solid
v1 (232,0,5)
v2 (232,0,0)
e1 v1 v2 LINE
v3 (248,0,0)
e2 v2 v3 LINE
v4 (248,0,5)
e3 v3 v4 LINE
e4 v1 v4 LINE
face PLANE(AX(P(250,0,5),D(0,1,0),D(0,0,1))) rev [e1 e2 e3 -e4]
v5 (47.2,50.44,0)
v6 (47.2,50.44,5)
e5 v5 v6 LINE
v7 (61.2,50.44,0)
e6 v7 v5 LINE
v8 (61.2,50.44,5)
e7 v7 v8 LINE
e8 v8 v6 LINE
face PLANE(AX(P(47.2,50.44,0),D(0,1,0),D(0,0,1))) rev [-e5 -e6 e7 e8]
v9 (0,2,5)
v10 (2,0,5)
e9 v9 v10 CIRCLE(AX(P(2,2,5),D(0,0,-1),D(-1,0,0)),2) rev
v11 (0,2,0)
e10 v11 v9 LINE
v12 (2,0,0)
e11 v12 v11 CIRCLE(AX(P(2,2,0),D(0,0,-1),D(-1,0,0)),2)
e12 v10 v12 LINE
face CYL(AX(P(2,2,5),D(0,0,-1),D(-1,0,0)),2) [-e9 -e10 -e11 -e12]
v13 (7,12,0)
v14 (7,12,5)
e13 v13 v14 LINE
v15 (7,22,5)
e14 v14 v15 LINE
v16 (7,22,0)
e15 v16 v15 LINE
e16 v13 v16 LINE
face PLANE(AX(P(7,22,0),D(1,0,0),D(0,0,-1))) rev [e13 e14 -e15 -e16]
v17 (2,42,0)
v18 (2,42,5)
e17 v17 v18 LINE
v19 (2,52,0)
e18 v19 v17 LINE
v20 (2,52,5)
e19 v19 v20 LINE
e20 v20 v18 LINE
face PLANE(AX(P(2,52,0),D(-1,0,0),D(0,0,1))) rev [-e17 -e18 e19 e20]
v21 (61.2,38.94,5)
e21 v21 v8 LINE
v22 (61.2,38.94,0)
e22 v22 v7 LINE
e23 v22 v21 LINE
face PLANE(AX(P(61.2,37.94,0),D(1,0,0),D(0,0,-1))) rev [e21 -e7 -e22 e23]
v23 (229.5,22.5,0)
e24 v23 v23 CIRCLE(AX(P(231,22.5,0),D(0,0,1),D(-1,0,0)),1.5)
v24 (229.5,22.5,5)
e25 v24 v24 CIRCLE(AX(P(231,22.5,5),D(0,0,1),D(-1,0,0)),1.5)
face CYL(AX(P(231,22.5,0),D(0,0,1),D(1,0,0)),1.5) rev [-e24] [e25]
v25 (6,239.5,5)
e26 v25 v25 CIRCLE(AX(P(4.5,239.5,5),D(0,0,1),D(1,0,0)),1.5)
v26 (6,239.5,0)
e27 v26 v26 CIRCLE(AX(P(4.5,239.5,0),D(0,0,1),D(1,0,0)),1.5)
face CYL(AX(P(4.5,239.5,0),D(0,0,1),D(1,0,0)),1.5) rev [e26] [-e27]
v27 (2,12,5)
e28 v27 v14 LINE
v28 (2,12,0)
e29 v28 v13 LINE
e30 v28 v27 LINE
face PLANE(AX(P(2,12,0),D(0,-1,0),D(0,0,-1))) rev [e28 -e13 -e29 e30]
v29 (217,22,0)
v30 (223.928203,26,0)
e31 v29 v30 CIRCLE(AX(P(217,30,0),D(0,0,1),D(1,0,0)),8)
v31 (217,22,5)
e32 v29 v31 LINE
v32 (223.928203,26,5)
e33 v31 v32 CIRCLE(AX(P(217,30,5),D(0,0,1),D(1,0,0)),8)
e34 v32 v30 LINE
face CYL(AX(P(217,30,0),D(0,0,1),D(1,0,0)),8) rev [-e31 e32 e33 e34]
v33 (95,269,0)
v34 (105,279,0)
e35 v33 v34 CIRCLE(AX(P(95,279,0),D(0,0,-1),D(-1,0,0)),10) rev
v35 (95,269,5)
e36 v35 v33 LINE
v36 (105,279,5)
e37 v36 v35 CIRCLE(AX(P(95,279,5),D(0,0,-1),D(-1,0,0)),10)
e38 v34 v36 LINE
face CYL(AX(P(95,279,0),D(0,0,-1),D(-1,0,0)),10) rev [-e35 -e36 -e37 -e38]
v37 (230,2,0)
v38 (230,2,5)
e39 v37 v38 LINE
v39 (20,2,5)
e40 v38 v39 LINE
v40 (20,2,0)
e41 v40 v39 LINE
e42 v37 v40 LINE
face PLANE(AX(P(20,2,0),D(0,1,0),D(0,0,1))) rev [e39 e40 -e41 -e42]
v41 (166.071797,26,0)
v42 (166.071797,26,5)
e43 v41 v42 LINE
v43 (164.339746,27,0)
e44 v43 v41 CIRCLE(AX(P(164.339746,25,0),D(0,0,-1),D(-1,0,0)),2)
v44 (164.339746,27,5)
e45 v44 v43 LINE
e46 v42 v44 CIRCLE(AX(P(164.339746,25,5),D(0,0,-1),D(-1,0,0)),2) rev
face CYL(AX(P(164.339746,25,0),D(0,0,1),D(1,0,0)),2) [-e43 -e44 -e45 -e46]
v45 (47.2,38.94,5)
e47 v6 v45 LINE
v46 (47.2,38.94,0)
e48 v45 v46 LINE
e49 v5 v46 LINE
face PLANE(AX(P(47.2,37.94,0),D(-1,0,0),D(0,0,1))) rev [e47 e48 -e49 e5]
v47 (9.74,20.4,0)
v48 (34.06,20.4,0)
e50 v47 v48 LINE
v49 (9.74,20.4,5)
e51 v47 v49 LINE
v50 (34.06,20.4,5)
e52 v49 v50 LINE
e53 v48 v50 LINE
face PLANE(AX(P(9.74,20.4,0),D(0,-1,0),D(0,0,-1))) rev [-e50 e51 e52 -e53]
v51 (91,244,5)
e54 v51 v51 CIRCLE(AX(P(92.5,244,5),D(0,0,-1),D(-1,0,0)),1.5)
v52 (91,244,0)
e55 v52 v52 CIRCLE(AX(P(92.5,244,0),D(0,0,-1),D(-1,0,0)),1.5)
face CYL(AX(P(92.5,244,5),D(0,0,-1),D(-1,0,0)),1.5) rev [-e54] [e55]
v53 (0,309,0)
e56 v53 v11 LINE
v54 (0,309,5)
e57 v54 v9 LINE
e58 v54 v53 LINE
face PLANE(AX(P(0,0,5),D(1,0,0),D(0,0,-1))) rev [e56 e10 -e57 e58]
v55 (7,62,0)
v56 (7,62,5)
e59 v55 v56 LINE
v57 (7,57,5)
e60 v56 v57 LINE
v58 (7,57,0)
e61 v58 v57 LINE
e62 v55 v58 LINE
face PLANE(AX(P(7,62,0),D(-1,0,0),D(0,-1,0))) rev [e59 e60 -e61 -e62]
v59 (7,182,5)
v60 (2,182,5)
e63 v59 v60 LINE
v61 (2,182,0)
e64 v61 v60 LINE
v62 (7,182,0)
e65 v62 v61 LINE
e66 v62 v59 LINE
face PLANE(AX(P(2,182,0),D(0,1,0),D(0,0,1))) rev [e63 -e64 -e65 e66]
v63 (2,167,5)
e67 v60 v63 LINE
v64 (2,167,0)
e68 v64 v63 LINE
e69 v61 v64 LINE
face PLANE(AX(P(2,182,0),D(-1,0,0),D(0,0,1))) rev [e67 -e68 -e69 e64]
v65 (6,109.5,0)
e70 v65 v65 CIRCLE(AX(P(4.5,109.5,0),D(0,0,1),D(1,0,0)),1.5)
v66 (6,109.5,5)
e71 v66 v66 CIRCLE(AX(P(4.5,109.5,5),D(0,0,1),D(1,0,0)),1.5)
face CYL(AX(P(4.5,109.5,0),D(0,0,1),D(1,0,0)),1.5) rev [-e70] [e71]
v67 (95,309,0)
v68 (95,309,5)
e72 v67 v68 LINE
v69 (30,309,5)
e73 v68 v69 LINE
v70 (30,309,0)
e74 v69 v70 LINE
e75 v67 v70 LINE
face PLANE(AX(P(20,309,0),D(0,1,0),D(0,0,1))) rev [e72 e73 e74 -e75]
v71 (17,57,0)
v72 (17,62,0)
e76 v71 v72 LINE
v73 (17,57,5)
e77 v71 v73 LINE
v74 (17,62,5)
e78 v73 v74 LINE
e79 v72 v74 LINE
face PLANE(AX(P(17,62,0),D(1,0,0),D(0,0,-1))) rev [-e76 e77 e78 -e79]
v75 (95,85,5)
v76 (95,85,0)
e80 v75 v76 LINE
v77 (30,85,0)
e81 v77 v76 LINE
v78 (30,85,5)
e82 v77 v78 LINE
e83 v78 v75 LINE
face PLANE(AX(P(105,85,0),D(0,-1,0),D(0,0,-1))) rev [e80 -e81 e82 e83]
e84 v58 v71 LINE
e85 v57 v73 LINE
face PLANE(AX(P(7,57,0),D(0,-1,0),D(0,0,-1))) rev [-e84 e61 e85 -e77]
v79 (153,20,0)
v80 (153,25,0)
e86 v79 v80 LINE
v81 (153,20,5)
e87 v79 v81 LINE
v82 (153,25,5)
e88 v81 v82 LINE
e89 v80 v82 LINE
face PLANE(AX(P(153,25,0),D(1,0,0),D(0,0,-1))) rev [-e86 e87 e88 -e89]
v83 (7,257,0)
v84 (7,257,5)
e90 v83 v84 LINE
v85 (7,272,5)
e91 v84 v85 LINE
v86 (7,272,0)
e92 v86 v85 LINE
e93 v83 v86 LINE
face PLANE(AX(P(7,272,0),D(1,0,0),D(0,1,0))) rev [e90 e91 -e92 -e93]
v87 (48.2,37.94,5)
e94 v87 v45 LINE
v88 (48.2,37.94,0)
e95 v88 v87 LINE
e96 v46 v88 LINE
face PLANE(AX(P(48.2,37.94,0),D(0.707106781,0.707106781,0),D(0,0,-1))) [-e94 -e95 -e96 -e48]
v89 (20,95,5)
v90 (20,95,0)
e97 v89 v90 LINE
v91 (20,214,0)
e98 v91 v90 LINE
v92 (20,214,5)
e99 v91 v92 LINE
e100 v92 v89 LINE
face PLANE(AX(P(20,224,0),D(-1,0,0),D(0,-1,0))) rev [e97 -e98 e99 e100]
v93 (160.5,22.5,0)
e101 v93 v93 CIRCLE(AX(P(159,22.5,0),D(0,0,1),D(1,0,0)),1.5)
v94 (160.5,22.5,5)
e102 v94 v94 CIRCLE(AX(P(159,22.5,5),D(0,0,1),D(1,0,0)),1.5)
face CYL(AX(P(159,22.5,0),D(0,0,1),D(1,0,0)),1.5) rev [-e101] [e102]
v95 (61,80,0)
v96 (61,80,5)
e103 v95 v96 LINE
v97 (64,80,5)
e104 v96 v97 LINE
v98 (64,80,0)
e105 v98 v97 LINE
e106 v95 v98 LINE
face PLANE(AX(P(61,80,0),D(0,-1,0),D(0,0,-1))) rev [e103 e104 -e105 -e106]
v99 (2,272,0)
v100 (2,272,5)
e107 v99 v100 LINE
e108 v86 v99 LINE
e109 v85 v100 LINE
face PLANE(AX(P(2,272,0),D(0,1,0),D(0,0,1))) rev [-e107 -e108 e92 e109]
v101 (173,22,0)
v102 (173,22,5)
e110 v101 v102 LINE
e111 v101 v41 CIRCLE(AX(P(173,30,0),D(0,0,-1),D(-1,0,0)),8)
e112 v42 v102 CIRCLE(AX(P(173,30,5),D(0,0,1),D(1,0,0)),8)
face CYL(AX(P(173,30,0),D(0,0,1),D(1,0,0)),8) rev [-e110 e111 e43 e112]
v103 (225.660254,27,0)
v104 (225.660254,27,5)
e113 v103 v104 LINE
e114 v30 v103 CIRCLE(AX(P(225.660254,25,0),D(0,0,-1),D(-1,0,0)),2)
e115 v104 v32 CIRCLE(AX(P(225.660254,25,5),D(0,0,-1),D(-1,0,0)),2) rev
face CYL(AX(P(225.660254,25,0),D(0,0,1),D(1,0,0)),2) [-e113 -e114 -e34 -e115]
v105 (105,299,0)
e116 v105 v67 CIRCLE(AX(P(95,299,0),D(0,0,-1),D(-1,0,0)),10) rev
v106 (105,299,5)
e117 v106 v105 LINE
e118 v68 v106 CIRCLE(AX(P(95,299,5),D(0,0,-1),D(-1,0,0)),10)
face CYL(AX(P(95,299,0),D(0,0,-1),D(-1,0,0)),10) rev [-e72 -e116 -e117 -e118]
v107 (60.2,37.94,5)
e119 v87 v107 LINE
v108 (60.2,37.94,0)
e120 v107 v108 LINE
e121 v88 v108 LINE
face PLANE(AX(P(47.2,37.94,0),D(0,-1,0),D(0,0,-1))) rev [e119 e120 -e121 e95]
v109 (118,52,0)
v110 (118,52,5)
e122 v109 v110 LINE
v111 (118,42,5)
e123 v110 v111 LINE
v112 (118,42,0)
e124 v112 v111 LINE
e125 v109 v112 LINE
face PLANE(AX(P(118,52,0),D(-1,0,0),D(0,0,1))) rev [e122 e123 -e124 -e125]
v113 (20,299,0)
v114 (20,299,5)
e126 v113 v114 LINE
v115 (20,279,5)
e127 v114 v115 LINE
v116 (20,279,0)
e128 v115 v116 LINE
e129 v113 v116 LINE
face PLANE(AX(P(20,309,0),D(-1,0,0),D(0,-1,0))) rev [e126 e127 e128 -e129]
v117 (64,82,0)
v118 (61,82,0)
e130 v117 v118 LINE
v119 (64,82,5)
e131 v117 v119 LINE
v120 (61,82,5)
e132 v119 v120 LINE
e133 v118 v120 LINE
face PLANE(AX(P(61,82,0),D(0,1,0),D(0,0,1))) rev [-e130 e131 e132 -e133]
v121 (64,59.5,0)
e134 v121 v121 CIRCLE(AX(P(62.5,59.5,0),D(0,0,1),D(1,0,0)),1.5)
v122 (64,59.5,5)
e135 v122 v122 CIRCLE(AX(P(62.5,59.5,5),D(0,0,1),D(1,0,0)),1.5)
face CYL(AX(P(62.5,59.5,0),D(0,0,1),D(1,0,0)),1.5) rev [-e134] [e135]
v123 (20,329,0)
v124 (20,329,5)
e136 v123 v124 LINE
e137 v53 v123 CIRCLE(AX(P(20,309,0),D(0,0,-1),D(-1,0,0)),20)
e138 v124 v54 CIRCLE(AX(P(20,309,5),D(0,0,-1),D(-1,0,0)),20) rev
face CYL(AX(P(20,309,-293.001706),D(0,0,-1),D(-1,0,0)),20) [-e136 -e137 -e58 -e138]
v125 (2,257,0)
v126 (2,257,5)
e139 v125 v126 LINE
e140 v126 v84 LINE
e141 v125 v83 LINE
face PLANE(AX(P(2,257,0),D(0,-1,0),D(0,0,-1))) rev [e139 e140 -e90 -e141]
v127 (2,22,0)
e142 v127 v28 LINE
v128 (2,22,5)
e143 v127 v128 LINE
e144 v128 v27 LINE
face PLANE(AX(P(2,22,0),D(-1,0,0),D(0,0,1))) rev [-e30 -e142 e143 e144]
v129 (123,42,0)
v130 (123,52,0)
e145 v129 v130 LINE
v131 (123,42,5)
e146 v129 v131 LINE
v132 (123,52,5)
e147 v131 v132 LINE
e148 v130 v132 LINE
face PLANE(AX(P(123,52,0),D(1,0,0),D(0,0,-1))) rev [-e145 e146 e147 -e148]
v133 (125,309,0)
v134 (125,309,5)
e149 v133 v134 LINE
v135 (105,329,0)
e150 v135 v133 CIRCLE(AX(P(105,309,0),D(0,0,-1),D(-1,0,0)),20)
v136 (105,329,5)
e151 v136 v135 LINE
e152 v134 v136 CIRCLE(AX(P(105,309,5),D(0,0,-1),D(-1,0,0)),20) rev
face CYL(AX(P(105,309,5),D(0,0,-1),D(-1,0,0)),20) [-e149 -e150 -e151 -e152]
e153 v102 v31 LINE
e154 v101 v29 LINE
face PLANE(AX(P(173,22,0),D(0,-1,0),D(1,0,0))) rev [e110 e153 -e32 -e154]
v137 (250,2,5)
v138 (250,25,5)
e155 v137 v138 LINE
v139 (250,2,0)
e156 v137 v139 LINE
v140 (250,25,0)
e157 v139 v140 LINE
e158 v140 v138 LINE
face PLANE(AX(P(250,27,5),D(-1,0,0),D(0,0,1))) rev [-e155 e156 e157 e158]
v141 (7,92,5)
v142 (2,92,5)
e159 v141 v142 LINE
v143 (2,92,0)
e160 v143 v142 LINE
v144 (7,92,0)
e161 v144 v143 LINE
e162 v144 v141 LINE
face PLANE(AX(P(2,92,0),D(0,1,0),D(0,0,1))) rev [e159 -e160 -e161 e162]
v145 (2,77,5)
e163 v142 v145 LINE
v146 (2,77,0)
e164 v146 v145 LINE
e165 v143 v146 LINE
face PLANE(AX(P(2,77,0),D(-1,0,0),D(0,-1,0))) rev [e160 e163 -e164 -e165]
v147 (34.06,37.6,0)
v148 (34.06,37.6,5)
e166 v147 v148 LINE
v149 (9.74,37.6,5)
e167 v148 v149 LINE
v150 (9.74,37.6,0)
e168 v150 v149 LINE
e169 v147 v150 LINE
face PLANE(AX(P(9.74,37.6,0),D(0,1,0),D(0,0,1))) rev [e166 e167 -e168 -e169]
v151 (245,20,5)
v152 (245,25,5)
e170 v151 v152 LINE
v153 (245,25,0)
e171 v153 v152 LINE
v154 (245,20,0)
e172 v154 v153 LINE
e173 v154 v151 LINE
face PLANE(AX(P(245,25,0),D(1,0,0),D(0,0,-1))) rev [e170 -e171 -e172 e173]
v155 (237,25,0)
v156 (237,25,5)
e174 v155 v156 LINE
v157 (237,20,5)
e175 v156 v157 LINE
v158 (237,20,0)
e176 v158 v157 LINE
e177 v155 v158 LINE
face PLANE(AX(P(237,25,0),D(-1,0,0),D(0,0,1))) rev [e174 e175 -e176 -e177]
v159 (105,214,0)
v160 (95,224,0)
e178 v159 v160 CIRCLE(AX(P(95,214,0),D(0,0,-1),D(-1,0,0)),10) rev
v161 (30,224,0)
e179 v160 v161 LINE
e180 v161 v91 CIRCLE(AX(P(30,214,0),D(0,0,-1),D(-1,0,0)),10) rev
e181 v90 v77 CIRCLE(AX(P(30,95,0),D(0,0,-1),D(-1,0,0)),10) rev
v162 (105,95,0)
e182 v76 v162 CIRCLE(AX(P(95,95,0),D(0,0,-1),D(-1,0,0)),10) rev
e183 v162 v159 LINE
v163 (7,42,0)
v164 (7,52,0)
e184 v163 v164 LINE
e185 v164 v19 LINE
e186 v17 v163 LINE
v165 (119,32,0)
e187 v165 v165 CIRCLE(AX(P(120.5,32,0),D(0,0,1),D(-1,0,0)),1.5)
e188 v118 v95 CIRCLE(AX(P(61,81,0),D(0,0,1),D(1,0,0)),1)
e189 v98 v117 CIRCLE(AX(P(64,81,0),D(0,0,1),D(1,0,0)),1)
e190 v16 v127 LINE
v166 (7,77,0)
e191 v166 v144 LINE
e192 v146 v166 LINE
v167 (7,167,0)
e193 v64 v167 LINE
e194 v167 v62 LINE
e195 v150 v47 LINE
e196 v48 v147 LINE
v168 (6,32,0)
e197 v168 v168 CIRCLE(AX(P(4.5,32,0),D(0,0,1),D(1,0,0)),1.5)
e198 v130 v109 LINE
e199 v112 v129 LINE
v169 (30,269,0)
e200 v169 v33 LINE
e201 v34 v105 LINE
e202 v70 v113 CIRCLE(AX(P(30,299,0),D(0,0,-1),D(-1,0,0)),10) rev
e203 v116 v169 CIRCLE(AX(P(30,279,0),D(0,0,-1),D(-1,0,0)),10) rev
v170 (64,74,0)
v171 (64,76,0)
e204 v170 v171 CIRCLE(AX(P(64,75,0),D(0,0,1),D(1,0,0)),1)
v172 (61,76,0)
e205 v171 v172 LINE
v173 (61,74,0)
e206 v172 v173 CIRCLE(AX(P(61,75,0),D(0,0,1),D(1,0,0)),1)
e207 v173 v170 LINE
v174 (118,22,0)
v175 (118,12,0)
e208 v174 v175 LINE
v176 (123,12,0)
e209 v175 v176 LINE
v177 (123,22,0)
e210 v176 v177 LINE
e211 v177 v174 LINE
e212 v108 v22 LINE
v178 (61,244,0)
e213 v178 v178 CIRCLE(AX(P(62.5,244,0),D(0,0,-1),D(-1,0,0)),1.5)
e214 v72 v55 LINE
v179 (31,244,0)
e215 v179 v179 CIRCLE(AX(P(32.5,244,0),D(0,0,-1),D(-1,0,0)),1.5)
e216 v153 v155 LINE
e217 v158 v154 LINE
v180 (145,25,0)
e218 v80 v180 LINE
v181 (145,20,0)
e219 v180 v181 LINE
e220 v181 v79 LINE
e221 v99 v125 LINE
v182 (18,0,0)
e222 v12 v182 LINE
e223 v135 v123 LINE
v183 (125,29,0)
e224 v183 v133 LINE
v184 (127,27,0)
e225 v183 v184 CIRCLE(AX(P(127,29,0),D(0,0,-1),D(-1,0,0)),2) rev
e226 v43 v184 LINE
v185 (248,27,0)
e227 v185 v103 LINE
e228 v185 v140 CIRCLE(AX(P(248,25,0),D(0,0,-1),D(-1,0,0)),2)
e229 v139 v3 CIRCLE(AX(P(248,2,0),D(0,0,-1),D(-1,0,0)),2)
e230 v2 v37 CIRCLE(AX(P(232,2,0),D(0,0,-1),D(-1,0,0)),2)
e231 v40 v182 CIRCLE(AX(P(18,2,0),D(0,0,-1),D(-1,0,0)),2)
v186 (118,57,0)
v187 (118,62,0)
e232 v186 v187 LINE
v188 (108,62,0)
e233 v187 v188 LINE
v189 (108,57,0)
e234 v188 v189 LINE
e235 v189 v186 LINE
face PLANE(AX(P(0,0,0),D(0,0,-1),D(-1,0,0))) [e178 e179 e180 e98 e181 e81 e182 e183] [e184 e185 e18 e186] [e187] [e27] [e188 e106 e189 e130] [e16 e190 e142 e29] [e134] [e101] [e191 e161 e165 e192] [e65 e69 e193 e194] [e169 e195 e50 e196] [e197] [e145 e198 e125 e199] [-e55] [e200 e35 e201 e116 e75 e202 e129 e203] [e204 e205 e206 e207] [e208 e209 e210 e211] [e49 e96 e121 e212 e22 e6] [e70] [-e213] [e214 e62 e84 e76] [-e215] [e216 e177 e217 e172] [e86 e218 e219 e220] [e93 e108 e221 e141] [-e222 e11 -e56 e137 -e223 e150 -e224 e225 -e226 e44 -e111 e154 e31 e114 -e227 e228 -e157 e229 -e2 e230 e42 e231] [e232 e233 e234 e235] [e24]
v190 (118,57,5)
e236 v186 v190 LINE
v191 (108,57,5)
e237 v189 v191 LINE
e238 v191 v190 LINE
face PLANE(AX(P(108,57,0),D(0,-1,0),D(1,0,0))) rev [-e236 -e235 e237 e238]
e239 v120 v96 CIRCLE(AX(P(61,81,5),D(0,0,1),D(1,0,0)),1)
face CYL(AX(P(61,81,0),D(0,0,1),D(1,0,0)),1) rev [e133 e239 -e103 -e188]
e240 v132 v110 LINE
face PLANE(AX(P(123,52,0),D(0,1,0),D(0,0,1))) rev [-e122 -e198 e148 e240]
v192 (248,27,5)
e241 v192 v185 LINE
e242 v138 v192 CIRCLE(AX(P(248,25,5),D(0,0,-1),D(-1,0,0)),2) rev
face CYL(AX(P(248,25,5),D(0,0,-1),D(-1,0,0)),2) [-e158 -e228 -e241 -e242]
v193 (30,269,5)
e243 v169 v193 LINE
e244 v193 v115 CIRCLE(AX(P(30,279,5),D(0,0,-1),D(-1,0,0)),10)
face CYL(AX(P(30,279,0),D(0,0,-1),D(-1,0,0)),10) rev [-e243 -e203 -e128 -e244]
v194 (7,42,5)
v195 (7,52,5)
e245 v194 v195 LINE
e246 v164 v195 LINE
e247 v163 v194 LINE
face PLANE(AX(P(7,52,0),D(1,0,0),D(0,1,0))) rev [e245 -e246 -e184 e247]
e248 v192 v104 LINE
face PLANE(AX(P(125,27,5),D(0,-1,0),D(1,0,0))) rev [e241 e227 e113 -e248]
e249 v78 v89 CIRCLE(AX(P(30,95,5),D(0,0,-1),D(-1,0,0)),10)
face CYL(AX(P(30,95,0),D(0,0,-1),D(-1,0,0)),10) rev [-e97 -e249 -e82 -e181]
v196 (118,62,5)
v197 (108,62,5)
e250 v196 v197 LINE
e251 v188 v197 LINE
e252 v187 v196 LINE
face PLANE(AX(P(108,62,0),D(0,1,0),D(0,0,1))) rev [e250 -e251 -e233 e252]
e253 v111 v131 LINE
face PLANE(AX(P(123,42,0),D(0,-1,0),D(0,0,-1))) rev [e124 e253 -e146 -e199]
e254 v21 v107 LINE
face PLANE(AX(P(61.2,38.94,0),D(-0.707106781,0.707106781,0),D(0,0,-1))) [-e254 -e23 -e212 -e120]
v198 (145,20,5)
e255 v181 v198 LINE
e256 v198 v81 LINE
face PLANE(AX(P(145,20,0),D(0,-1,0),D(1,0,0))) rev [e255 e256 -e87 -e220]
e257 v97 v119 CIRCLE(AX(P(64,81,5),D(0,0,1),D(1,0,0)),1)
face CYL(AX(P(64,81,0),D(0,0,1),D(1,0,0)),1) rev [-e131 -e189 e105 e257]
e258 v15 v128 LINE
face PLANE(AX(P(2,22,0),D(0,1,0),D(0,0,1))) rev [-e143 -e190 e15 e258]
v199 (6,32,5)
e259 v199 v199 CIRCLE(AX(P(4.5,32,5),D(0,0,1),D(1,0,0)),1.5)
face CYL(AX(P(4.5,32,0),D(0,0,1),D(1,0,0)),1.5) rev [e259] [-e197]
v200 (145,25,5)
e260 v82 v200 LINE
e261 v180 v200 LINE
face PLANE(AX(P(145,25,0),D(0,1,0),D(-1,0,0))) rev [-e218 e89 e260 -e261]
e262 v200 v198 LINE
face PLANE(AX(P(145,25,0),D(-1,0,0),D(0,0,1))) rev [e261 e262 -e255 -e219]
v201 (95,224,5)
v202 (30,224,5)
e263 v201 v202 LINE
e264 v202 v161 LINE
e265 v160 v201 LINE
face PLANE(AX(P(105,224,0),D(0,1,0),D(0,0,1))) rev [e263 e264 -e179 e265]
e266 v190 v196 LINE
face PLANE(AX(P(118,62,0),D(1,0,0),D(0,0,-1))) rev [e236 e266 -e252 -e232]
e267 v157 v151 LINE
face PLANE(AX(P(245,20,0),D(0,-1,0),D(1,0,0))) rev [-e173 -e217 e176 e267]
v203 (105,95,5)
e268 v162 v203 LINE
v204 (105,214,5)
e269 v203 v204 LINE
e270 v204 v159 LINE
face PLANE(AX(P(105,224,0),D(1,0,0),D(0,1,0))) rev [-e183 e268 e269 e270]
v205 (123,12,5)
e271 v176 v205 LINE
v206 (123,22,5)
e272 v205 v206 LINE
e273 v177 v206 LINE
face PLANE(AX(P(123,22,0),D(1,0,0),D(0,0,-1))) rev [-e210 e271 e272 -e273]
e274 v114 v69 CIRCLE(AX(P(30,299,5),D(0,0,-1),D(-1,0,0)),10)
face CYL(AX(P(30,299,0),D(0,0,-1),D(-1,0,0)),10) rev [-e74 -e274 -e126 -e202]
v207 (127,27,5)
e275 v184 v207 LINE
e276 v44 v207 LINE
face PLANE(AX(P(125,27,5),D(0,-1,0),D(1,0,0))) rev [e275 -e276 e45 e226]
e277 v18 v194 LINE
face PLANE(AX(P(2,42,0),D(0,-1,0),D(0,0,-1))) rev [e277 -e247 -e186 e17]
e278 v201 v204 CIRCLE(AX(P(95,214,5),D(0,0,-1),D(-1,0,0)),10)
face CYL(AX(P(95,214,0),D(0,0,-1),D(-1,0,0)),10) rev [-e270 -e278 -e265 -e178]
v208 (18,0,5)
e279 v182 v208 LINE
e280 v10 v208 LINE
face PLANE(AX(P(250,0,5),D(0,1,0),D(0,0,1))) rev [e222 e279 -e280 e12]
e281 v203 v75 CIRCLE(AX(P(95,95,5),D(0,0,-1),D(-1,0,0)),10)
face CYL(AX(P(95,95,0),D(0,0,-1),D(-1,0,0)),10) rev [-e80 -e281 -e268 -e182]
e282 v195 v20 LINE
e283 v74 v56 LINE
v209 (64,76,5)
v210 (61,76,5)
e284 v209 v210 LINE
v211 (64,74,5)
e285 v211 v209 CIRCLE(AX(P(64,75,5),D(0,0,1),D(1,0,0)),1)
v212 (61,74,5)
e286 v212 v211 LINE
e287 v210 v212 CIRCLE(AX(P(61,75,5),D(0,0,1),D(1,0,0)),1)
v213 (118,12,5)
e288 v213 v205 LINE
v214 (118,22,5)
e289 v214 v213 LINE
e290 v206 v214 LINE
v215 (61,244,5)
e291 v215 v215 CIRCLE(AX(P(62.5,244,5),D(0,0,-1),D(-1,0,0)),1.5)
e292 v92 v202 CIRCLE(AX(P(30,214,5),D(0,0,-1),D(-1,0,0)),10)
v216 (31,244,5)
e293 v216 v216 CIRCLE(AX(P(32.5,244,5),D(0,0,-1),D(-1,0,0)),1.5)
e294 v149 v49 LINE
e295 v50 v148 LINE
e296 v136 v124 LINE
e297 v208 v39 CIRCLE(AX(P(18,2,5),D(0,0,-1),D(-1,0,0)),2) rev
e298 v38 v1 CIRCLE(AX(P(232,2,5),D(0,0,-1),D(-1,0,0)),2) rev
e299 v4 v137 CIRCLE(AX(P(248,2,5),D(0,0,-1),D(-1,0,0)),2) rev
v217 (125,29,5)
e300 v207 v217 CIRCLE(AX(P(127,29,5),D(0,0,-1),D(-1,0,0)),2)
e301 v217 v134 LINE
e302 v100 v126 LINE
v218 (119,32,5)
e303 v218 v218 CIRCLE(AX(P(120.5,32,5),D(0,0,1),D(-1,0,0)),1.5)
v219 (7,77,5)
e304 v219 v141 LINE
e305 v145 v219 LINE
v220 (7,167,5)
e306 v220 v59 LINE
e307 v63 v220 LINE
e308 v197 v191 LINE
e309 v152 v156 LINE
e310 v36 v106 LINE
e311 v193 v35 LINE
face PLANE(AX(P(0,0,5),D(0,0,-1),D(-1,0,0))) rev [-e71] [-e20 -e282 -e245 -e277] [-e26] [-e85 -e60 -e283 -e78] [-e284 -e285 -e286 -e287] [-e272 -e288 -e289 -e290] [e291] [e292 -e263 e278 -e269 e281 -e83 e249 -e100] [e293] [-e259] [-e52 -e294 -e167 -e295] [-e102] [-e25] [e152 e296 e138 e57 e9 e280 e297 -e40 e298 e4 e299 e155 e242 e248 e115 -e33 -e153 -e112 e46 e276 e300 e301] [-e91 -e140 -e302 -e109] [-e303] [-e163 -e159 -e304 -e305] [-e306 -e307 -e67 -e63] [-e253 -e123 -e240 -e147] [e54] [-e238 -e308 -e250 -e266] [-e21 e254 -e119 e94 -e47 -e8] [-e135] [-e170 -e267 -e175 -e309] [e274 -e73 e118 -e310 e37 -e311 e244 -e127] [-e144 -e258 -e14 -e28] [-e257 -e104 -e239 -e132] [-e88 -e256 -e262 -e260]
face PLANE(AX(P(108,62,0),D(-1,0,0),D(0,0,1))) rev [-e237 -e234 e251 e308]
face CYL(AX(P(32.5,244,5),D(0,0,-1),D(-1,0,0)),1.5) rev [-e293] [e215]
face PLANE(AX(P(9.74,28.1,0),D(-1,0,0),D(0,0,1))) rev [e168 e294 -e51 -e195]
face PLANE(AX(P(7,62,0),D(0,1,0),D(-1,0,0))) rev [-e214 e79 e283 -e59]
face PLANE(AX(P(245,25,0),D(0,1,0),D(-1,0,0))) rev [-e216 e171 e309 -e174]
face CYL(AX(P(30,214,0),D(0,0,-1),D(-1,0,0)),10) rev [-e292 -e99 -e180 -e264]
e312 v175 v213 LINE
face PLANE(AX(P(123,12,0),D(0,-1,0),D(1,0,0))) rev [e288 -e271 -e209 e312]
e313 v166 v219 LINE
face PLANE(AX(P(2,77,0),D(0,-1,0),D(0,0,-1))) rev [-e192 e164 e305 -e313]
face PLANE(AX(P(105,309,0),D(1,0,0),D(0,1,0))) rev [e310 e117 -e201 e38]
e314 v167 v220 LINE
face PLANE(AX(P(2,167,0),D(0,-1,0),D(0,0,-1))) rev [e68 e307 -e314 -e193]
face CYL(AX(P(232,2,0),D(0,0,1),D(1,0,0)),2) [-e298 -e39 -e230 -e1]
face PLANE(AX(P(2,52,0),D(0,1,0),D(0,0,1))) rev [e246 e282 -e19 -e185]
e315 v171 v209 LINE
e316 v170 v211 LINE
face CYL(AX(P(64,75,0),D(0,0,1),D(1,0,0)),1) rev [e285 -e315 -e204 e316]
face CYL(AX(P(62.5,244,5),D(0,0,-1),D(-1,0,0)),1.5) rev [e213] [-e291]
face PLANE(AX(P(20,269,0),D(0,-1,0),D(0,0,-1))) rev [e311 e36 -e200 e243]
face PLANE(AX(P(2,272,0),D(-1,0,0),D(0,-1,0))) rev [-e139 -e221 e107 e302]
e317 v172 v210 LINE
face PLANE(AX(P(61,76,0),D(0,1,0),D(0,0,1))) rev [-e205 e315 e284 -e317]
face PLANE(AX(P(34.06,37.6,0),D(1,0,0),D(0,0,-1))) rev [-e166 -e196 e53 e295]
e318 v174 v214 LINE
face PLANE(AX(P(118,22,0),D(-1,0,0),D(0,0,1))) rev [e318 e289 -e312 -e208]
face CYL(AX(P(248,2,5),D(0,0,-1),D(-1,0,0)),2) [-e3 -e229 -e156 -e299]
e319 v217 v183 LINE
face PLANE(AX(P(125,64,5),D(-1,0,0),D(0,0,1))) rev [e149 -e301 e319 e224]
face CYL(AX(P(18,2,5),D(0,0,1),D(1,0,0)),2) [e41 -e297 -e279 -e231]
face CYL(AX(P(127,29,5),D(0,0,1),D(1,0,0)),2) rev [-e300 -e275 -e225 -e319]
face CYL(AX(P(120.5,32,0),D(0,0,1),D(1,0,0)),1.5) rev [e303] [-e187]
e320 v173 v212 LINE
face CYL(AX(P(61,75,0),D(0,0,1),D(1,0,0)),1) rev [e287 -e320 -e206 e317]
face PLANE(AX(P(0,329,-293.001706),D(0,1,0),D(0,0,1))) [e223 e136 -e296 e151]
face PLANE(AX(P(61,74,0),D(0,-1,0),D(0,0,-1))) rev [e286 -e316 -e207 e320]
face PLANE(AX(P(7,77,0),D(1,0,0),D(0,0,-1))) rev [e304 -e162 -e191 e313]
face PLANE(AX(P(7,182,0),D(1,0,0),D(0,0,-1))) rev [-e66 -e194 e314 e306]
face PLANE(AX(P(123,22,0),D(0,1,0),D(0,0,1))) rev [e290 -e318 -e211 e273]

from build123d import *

# Parameters (mm, degrees)
BOSS_EXTRUDE1_DEPTH = 5
SKETCH7_W           = 14
SKETCH7_H           = 12.5
CUT_EXTRUDE4_DEPTH  = 259.110441478
SKETCH3_W           = 125
SKETCH3_H           = 265
BOSS_EXTRUDE2_DEPTH = 5
SKETCH4_W           = 85
SKETCH4_H           = 40
SKETCH4_H_2         = 139
CUT_EXTRUDE2_DEPTH  = 414.238429965
SKETCH2_R           = 1.5
SKETCH2_W           = 10
SKETCH2_H           = 5
SKETCH2_W_2         = 8
SKETCH2_W_3         = 5
SKETCH2_H_2         = 10
SKETCH2_W_4         = 210
SKETCH2_H_3         = 2
SKETCH2_H_4         = 15
CUT_EXTRUDE1_DEPTH  = 414.238429965
SKETCH5_R           = 1.5
CUT_EXTRUDE3_DEPTH  = 414.238429965
FILLET1_R           = 2
FILLET2_R           = 10
FILLET3_R           = 20
CHAMFER1_SIZE       = 1


with BuildPart() as part:
    # Sketch1 → Boss-Extrude1 (new body)
    with BuildSketch(Plane.XY):
        Polygon((0, 0), (0, 64), (125, 64), (125, 27), (250, 27), (250, 0), align=None)
    extrude(amount=BOSS_EXTRUDE1_DEPTH)

    # Sketch7 → Cut-Extrude4 (cut, through all)
    with BuildSketch(Plane.XY.offset(5)):
        with Locations((54.2, 44.19)):
            Rectangle(SKETCH7_W, SKETCH7_H)
        Polygon((9.74, 28.1), (9.74, 20.4), (34.06, 20.4), (34.06, 28.1), (34.06, 37.6), (9.74, 37.6), align=None)
    extrude(amount=-CUT_EXTRUDE4_DEPTH, mode=Mode.SUBTRACT)

    # Sketch3 → Boss-Extrude2 (add)
    with BuildSketch(Plane.XY.offset(5)):
        with Locations((62.5, 196.5)):
            Rectangle(SKETCH3_W, SKETCH3_H)
    extrude(amount=-BOSS_EXTRUDE2_DEPTH)

    # Sketch4 → Cut-Extrude2 (cut, through all)
    with BuildSketch(Plane.XY.offset(5)):
        with Locations((62.5, 289)):
            Rectangle(SKETCH4_W, SKETCH4_H)
        with Locations((62.5, 154.5)):
            Rectangle(SKETCH4_W, SKETCH4_H_2)
    extrude(amount=-CUT_EXTRUDE2_DEPTH, mode=Mode.SUBTRACT)

    # Sketch2 → Cut-Extrude1 (cut, through all)
    with BuildSketch(Plane.XY.offset(5)):
        with Locations((4.5, 32)):
            Circle(SKETCH2_R)
        with Locations((62.5, 59.5)):
            Circle(SKETCH2_R)
        with Locations(Location((120.5, 32, 0), (0, 0, 180))):
            Circle(SKETCH2_R)
        with Locations((159, 22.5)):
            Circle(SKETCH2_R)
        with Locations(Location((231, 22.5, 0), (0, 0, 180))):
            Circle(SKETCH2_R)
        with Locations((4.5, 109.5)):
            Circle(SKETCH2_R)
        with Locations((4.5, 239.5)):
            Circle(SKETCH2_R)
        with Locations((12, 59.5)):
            Rectangle(SKETCH2_W, SKETCH2_H)
        with Locations((113, 59.5)):
            Rectangle(SKETCH2_W, SKETCH2_H)
        with Locations((241, 22.5)):
            Rectangle(SKETCH2_W_2, SKETCH2_H)
        with Locations((149, 22.5)):
            Rectangle(SKETCH2_W_2, SKETCH2_H)
        with Locations((120.5, 47)):
            Rectangle(SKETCH2_W_3, SKETCH2_H_2)
        with Locations((120.5, 17)):
            Rectangle(SKETCH2_W_3, SKETCH2_H_2)
        with Locations((4.5, 17)):
            Rectangle(SKETCH2_W_3, SKETCH2_H_2)
        with Locations((4.5, 47)):
            Rectangle(SKETCH2_W_3, SKETCH2_H_2)
        with BuildLine():
            Line((173, 22), (217, 22))
            ThreePointArc((217, 22), (225, 30), (217, 38))
            Line((217, 38), (173, 38))
            ThreePointArc((173, 38), (165, 30), (173, 22))
        make_face()
        with Locations((125, 1)):
            Rectangle(SKETCH2_W_4, SKETCH2_H_3)
        with Locations((4.5, 84.5)):
            Rectangle(SKETCH2_W_3, SKETCH2_H_4)
        with Locations((4.5, 264.5)):
            Rectangle(SKETCH2_W_3, SKETCH2_H_4)
        with Locations((4.5, 174.5)):
            Rectangle(SKETCH2_W_3, SKETCH2_H_4)
        with BuildLine():
            Line((61, 82), (64, 82))
            ThreePointArc((64, 82), (65, 81), (64, 80))
            Line((64, 80), (61, 80))
            ThreePointArc((61, 80), (60, 81), (61, 82))
        make_face()
        with BuildLine():
            Line((61, 76), (64, 76))
            ThreePointArc((64, 76), (65, 75), (64, 74))
            Line((64, 74), (61, 74))
            ThreePointArc((61, 74), (60, 75), (61, 76))
        make_face()
    extrude(amount=-CUT_EXTRUDE1_DEPTH, mode=Mode.SUBTRACT)

    # Sketch5 → Cut-Extrude3 (cut, through all)
    with BuildSketch(Plane(origin=(0, 0, 0), x_dir=(-1, 0, 0), z_dir=(0, 0, -1))):
        with Locations((-92.5, 244)):
            Circle(SKETCH5_R)
        with Locations((-62.5, 244)):
            Circle(SKETCH5_R)
        with Locations((-32.5, 244)):
            Circle(SKETCH5_R)
    extrude(amount=-CUT_EXTRUDE3_DEPTH, mode=Mode.SUBTRACT)

    # Fillet1
    fillet1_edges = [part.edges().sort_by_distance(p)[0] for p in [
        (250, 0, 2.5),
        (250, 27, 2.5),
        (0, 0, 2.5),
        (125, 27, 2.5),
        (224.416198487, 27, 2.5),
        (165.583801513, 27, 2.5),
        (230, 0, 2.5),
        (20, 0, 2.5),
    ]]
    fillet(fillet1_edges, radius=FILLET1_R - 0.0001)  # a hair under: the kernel refuses the full size

    # Fillet2
    fillet2_edges = [part.edges().sort_by_distance(p)[0] for p in [
        (20, 269, 2.5),
        (20, 309, 2.5),
        (105, 309, 2.5),
        (105, 269, 2.5),
        (105, 224, 2.5),
        (105, 85, 2.5),
        (20, 85, 2.5),
        (20, 224, 2.5),
    ]]
    fillet(fillet2_edges, radius=FILLET2_R)

    # Fillet3
    fillet3_edges = [part.edges().sort_by_distance(p)[0] for p in [
        (125, 329, 2.5),
        (0, 329, 2.5),
    ]]
    fillet(fillet3_edges, radius=FILLET3_R)

    # Chamfer1
    chamfer1_edges = [part.edges().sort_by_distance(p)[0] for p in [
        (47.2, 37.94, 2.5),
        (61.2, 37.94, 2.5),
    ]]
    chamfer(chamfer1_edges, length=CHAMFER1_SIZE)


solid = part.part
